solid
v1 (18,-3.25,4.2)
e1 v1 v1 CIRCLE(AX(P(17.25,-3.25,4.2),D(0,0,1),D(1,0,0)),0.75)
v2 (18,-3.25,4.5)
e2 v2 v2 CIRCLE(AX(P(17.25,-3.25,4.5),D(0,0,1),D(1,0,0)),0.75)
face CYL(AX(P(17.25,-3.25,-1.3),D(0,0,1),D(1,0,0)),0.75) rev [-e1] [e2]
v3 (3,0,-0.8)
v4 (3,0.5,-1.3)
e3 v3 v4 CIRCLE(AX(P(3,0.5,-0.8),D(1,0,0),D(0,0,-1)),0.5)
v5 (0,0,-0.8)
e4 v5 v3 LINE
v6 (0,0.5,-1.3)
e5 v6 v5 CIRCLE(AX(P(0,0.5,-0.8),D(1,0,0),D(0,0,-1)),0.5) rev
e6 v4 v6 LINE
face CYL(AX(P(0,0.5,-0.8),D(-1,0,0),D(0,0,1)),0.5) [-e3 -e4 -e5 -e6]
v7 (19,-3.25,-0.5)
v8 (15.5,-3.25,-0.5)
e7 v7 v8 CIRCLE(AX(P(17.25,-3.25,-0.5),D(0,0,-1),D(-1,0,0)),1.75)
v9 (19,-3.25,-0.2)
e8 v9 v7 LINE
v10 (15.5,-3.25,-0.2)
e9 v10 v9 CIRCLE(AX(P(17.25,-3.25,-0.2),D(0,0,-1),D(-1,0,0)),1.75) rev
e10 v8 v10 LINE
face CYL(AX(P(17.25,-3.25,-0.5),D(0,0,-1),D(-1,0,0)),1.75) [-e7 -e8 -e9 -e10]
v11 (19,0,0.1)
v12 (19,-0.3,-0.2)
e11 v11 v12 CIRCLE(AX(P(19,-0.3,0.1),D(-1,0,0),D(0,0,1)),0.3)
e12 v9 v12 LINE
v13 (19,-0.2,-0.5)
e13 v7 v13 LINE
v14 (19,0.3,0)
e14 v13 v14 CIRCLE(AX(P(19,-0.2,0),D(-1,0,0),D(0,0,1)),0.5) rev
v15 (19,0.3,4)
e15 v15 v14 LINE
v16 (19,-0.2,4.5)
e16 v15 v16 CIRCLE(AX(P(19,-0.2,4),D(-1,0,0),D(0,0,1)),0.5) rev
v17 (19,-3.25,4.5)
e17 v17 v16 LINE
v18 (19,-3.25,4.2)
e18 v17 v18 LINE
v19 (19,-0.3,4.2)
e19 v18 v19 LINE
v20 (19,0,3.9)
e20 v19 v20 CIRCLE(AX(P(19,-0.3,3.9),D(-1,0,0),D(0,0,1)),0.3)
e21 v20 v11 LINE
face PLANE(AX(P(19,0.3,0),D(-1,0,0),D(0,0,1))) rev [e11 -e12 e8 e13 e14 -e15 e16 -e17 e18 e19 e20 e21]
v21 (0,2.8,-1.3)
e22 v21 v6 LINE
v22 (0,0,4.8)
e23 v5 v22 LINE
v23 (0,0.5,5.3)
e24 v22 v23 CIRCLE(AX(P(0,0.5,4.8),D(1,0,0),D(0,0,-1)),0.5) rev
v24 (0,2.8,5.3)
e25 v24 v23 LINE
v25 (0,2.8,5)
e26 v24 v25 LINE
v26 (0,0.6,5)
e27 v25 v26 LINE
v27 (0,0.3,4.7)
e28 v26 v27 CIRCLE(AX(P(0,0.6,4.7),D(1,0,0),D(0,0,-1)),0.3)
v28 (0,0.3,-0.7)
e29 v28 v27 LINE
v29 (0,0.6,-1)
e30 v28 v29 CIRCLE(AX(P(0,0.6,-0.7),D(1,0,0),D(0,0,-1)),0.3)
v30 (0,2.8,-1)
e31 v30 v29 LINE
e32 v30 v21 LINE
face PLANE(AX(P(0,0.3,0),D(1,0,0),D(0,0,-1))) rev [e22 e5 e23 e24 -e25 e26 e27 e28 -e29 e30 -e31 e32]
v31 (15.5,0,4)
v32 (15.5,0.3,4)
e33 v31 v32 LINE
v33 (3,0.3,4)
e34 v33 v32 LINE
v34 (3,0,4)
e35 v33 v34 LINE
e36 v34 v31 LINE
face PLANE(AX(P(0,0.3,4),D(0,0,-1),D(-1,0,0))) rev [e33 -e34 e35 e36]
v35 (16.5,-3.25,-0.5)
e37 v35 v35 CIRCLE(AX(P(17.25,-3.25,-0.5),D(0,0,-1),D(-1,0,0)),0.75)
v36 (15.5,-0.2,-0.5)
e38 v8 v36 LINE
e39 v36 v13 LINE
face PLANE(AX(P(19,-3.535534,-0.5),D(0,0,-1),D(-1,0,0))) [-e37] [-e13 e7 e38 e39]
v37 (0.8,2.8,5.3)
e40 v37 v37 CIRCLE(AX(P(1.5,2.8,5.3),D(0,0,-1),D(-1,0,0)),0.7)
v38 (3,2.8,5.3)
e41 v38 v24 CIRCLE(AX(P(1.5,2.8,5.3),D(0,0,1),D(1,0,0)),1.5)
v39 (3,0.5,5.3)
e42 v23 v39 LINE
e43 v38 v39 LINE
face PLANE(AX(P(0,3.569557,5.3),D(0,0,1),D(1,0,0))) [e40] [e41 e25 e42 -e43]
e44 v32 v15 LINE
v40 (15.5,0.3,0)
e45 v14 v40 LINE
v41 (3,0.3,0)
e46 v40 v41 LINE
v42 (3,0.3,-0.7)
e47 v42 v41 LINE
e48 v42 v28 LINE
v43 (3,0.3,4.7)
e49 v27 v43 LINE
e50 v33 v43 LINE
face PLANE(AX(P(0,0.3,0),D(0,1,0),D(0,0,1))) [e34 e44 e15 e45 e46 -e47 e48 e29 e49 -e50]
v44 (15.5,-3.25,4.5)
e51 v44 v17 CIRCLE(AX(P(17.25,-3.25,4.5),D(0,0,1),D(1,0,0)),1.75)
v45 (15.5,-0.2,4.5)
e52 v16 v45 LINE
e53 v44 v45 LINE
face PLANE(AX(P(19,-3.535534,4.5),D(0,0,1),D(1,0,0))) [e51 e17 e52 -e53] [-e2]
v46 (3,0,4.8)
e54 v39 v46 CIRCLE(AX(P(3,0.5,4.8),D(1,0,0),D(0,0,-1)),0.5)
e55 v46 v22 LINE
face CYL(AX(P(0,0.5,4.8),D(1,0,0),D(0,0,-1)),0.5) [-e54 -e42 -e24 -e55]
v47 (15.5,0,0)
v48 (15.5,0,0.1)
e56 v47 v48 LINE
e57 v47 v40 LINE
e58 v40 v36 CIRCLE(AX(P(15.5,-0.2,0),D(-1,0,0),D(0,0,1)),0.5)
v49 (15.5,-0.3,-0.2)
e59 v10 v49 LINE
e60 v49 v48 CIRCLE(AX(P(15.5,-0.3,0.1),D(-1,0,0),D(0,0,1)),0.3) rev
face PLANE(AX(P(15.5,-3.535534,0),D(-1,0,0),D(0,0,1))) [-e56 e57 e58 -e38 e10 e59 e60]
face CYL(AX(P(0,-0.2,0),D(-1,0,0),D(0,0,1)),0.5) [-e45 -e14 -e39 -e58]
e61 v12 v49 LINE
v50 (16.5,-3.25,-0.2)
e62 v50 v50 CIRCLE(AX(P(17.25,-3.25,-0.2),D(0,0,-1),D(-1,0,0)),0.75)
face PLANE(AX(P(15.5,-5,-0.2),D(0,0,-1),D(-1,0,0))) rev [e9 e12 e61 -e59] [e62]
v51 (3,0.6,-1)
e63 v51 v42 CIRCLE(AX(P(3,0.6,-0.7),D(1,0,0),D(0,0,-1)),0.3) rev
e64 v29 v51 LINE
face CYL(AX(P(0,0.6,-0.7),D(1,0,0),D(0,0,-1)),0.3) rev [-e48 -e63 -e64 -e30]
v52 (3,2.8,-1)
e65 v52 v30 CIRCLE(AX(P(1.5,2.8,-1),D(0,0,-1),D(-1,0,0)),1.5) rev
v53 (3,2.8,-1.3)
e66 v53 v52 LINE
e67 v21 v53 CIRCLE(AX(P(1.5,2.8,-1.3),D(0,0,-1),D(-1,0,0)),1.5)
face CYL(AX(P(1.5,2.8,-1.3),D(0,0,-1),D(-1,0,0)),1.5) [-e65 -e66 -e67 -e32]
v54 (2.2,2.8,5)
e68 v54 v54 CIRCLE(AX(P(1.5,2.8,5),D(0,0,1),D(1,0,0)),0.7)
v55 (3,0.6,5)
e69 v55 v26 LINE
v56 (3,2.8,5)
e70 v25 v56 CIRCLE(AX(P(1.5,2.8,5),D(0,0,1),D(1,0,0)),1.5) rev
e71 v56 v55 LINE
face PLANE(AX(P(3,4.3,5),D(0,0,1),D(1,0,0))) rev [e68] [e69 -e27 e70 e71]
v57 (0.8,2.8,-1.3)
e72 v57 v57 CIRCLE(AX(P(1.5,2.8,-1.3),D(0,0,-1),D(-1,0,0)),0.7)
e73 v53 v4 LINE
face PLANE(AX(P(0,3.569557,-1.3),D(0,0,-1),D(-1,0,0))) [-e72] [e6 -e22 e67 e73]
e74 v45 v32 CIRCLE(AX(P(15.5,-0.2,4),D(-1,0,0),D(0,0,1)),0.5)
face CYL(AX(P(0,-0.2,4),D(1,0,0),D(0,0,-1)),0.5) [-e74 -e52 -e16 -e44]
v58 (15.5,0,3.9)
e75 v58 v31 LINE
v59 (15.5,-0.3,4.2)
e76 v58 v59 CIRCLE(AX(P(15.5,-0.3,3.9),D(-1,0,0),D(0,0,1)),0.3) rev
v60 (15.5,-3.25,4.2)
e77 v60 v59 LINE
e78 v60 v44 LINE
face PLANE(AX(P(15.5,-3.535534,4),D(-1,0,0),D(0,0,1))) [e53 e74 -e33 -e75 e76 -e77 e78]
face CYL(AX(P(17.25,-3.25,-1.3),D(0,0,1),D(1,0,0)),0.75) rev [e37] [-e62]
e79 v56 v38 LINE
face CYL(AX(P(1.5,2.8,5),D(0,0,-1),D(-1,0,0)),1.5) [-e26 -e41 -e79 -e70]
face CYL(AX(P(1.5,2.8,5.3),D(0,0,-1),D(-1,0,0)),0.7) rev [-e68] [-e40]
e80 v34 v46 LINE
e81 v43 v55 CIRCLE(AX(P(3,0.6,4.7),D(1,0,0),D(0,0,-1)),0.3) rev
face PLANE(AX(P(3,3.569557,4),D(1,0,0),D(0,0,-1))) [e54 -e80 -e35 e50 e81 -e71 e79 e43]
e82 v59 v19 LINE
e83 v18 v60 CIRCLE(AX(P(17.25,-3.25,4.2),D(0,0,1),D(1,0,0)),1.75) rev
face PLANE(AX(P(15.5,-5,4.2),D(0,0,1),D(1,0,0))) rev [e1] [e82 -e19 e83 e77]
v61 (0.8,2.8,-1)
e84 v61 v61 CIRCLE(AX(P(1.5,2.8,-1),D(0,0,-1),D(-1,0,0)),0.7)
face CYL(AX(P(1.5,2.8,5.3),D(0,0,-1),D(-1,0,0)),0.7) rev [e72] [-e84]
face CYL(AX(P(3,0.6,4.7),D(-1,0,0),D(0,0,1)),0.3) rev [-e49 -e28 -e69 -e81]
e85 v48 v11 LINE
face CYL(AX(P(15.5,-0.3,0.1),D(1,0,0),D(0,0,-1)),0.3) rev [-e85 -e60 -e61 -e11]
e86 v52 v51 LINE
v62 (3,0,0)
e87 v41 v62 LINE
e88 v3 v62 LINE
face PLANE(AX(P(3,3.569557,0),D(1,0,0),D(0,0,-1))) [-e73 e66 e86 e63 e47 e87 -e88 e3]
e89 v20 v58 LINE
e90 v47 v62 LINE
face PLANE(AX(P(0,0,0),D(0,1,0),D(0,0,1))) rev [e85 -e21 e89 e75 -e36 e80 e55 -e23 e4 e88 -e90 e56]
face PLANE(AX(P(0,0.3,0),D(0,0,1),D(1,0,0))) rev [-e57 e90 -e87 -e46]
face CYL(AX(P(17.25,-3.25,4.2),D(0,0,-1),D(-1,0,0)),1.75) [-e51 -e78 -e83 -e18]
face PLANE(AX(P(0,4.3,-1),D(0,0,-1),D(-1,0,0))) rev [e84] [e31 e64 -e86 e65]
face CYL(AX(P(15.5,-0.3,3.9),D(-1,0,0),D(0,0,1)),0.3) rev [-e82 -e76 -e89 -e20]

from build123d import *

# Parameters (mm, degrees)
SKETCH1_W           = 19
SKETCH1_H           = 4
BOSS_EXTRUDE1_DEPTH = 0.3
SKETCH2_W           = 3
SKETCH2_H           = 1.3
BOSS_EXTRUDE2_DEPTH = 0.3
SKETCH3_W           = 3
SKETCH3_H           = 0.3
BOSS_EXTRUDE3_DEPTH = 4
FILLET1_RADIUS      = 1.5
FILLET1_LENGTH      = 0.3
FILLET2_RADIUS      = 1.5
FILLET2_LENGTH      = 0.3
SKETCH4_R           = 0.7
CUT_EXTRUDE1_DEPTH  = 21.568179307
SKETCH6_W           = 3.5
SKETCH6_H           = 0.5
BOSS_EXTRUDE4_DEPTH = 0.3
SKETCH7_W           = 3.5
SKETCH7_H           = 0.3
BOSS_EXTRUDE5_DEPTH = 5
FILLET3_RADIUS      = 1.75
FILLET3_LENGTH      = 0.3
FILLET4_RADIUS      = 1.75
FILLET4_LENGTH      = 0.3
SKETCH8_R           = 0.75
CUT_EXTRUDE2_DEPTH  = 21.485116548
FILLET5_R           = 0.3
FILLET6_R           = 0.5


with BuildPart() as part:
    # Sketch1 → Boss-Extrude1 (new body)
    with BuildSketch(Plane(origin=(0, 0, 0), x_dir=(1, 0, 0), z_dir=(0, 1, 0))):
        with Locations((9.5, -2)):
            Rectangle(SKETCH1_W, SKETCH1_H)
    extrude(amount=BOSS_EXTRUDE1_DEPTH)

    # Sketch2 → Boss-Extrude2 (add)
    with BuildSketch(Plane.XZ):
        with Locations((1.5, -0.65)):
            Rectangle(SKETCH2_W, SKETCH2_H)
        with Locations((1.5, 4.65)):
            Rectangle(SKETCH2_W, SKETCH2_H)
    extrude(amount=-BOSS_EXTRUDE2_DEPTH)

    # Sketch3 → Boss-Extrude3 (add)
    with BuildSketch(Plane(origin=(0, 0.3, 0), x_dir=(1, 0, 0), z_dir=(0, 1, 0))):
        with Locations((1.5, 1.15)):
            Rectangle(SKETCH3_W, SKETCH3_H)
        with Locations((1.5, -5.15)):
            Rectangle(SKETCH3_W, SKETCH3_H)
    extrude(amount=BOSS_EXTRUDE3_DEPTH)

    # Fillet1: full round fillet: the end face becomes a half cylinder, R = half its width
    fillet1_face = Plane((1.5, 4.3, -1.15), x_dir=(0, 0, 1), z_dir=(0, 1, 0))  # on the end face: x along it, z out of the body
    fillet1_slab = fillet1_face.offset(-FILLET1_RADIUS / 2) * Box(FILLET1_LENGTH, 2 * FILLET1_RADIUS, FILLET1_RADIUS, mode=Mode.PRIVATE)  # the body's end, R deep
    fillet1_round = Plane((1.5, 2.8, -1.15), x_dir=(0, 1, 0), z_dir=(0, 0, 1)) * Cylinder(FILLET1_RADIUS, FILLET1_LENGTH, mode=Mode.PRIVATE)  # its axis R under the face
    add(fillet1_slab - fillet1_round, mode=Mode.SUBTRACT)

    # Fillet2: full round fillet: the end face becomes a half cylinder, R = half its width
    fillet2_face = Plane((1.5, 4.3, 5.15), x_dir=(0, 0, -1), z_dir=(0, 1, 0))  # on the end face: x along it, z out of the body
    fillet2_slab = fillet2_face.offset(-FILLET2_RADIUS / 2) * Box(FILLET2_LENGTH, 2 * FILLET2_RADIUS, FILLET2_RADIUS, mode=Mode.PRIVATE)  # the body's end, R deep
    fillet2_round = Plane((1.5, 2.8, 5.15), x_dir=(0, 1, 0), z_dir=(0, 0, -1)) * Cylinder(FILLET2_RADIUS, FILLET2_LENGTH, mode=Mode.PRIVATE)  # its axis R under the face
    add(fillet2_slab - fillet2_round, mode=Mode.SUBTRACT)

    # Sketch4 → Cut-Extrude1 (cut, through all)
    with BuildSketch(Plane(origin=(0, 0, -1.3), x_dir=(-1, 0, 0), z_dir=(0, 0, -1))):
        with Locations((-1.5, 2.8)):
            Circle(SKETCH4_R)
    extrude(amount=-CUT_EXTRUDE1_DEPTH, mode=Mode.SUBTRACT)

    # Sketch6 → Boss-Extrude4 (add)
    with BuildSketch(Plane(origin=(0, 0.3, 0), x_dir=(1, 0, 0), z_dir=(0, 1, 0))):
        with Locations((17.25, 0.25)):
            Rectangle(SKETCH6_W, SKETCH6_H)
        with Locations((17.25, -4.25)):
            Rectangle(SKETCH6_W, SKETCH6_H)
    extrude(amount=-BOSS_EXTRUDE4_DEPTH)

    # Sketch7 → Boss-Extrude5 (add)
    with BuildSketch(Plane.XZ):
        with Locations((17.25, -0.35)):
            Rectangle(SKETCH7_W, SKETCH7_H)
        with Locations((17.25, 4.35)):
            Rectangle(SKETCH7_W, SKETCH7_H)
    extrude(amount=BOSS_EXTRUDE5_DEPTH)

    # Fillet3: full round fillet: the end face becomes a half cylinder, R = half its width
    fillet3_face = Plane((17.25, -5, 4.35), x_dir=(0, 0, -1), z_dir=(0, -1, 0))  # on the end face: x along it, z out of the body
    fillet3_slab = fillet3_face.offset(-FILLET3_RADIUS / 2) * Box(FILLET3_LENGTH, 2 * FILLET3_RADIUS, FILLET3_RADIUS, mode=Mode.PRIVATE)  # the body's end, R deep
    fillet3_round = Plane((17.25, -3.25, 4.35), x_dir=(0, -1, 0), z_dir=(0, 0, -1)) * Cylinder(FILLET3_RADIUS, FILLET3_LENGTH, mode=Mode.PRIVATE)  # its axis R under the face
    add(fillet3_slab - fillet3_round, mode=Mode.SUBTRACT)

    # Fillet4: full round fillet: the end face becomes a half cylinder, R = half its width
    fillet4_face = Plane((17.25, -5, -0.35), x_dir=(0, 0, -1), z_dir=(0, -1, 0))  # on the end face: x along it, z out of the body
    fillet4_slab = fillet4_face.offset(-FILLET4_RADIUS / 2) * Box(FILLET4_LENGTH, 2 * FILLET4_RADIUS, FILLET4_RADIUS, mode=Mode.PRIVATE)  # the body's end, R deep
    fillet4_round = Plane((17.25, -3.25, -0.35), x_dir=(0, -1, 0), z_dir=(0, 0, -1)) * Cylinder(FILLET4_RADIUS, FILLET4_LENGTH, mode=Mode.PRIVATE)  # its axis R under the face
    add(fillet4_slab - fillet4_round, mode=Mode.SUBTRACT)

    # Sketch8 → Cut-Extrude2 (cut, through all)
    with BuildSketch(Plane.XY.offset(4.5)):
        with Locations((17.25, -3.25)):
            Circle(SKETCH8_R)
    extrude(amount=-CUT_EXTRUDE2_DEPTH, mode=Mode.SUBTRACT)

    # Fillet5
    # the kernel refuses this fillet: 0.3 mm, written as the material it adds along each edge
    with BuildSketch(Plane(origin=(19, 0, -0.2), x_dir=(0, 0, 1), z_dir=(-1, 0, 0))) as fillet5_piece_1:
        with BuildLine():
            CenterArc((FILLET5_R, -FILLET5_R), FILLET5_R, 90, 90)
            Line((0, -FILLET5_R), (0, 0))
            Line((0, 0), (FILLET5_R, 0))
        make_face()
    extrude(amount=3.5)
    with BuildSketch(Plane(origin=(19, 0, 4.2), x_dir=(0, 0, -1), z_dir=(-1, 0, 0))) as fillet5_piece_2:
        with BuildLine():
            CenterArc((FILLET5_R, FILLET5_R), FILLET5_R, 180, 90)
            Line((0, FILLET5_R), (0, 0))
            Line((0, 0), (FILLET5_R, 0))
        make_face()
    extrude(amount=3.5)
    with BuildSketch(Plane(origin=(3, 0.3, -1), x_dir=(0, 0, 1), z_dir=(-1, 0, 0)), Plane(origin=(0, 0.3, 5), x_dir=(0, 0, -1), z_dir=(1, 0, 0))) as fillet5_piece_3:
        with BuildLine():
            CenterArc((FILLET5_R, FILLET5_R), FILLET5_R, 180, 90)
            Line((0, FILLET5_R), (0, 0))
            Line((0, 0), (FILLET5_R, 0))
        make_face()
    extrude(amount=3)

    # Fillet6
    fillet6_edges = [part.edges().sort_by_distance(p)[0] for p in [
        (1.5, 0, 5.3),
        (1.5, 0, -1.3),
        (17.25, 0.3, 4.5),
        (17.25, 0.3, -0.5),
    ]]
    fillet(fillet6_edges, radius=FILLET6_R)


solid = part.part
